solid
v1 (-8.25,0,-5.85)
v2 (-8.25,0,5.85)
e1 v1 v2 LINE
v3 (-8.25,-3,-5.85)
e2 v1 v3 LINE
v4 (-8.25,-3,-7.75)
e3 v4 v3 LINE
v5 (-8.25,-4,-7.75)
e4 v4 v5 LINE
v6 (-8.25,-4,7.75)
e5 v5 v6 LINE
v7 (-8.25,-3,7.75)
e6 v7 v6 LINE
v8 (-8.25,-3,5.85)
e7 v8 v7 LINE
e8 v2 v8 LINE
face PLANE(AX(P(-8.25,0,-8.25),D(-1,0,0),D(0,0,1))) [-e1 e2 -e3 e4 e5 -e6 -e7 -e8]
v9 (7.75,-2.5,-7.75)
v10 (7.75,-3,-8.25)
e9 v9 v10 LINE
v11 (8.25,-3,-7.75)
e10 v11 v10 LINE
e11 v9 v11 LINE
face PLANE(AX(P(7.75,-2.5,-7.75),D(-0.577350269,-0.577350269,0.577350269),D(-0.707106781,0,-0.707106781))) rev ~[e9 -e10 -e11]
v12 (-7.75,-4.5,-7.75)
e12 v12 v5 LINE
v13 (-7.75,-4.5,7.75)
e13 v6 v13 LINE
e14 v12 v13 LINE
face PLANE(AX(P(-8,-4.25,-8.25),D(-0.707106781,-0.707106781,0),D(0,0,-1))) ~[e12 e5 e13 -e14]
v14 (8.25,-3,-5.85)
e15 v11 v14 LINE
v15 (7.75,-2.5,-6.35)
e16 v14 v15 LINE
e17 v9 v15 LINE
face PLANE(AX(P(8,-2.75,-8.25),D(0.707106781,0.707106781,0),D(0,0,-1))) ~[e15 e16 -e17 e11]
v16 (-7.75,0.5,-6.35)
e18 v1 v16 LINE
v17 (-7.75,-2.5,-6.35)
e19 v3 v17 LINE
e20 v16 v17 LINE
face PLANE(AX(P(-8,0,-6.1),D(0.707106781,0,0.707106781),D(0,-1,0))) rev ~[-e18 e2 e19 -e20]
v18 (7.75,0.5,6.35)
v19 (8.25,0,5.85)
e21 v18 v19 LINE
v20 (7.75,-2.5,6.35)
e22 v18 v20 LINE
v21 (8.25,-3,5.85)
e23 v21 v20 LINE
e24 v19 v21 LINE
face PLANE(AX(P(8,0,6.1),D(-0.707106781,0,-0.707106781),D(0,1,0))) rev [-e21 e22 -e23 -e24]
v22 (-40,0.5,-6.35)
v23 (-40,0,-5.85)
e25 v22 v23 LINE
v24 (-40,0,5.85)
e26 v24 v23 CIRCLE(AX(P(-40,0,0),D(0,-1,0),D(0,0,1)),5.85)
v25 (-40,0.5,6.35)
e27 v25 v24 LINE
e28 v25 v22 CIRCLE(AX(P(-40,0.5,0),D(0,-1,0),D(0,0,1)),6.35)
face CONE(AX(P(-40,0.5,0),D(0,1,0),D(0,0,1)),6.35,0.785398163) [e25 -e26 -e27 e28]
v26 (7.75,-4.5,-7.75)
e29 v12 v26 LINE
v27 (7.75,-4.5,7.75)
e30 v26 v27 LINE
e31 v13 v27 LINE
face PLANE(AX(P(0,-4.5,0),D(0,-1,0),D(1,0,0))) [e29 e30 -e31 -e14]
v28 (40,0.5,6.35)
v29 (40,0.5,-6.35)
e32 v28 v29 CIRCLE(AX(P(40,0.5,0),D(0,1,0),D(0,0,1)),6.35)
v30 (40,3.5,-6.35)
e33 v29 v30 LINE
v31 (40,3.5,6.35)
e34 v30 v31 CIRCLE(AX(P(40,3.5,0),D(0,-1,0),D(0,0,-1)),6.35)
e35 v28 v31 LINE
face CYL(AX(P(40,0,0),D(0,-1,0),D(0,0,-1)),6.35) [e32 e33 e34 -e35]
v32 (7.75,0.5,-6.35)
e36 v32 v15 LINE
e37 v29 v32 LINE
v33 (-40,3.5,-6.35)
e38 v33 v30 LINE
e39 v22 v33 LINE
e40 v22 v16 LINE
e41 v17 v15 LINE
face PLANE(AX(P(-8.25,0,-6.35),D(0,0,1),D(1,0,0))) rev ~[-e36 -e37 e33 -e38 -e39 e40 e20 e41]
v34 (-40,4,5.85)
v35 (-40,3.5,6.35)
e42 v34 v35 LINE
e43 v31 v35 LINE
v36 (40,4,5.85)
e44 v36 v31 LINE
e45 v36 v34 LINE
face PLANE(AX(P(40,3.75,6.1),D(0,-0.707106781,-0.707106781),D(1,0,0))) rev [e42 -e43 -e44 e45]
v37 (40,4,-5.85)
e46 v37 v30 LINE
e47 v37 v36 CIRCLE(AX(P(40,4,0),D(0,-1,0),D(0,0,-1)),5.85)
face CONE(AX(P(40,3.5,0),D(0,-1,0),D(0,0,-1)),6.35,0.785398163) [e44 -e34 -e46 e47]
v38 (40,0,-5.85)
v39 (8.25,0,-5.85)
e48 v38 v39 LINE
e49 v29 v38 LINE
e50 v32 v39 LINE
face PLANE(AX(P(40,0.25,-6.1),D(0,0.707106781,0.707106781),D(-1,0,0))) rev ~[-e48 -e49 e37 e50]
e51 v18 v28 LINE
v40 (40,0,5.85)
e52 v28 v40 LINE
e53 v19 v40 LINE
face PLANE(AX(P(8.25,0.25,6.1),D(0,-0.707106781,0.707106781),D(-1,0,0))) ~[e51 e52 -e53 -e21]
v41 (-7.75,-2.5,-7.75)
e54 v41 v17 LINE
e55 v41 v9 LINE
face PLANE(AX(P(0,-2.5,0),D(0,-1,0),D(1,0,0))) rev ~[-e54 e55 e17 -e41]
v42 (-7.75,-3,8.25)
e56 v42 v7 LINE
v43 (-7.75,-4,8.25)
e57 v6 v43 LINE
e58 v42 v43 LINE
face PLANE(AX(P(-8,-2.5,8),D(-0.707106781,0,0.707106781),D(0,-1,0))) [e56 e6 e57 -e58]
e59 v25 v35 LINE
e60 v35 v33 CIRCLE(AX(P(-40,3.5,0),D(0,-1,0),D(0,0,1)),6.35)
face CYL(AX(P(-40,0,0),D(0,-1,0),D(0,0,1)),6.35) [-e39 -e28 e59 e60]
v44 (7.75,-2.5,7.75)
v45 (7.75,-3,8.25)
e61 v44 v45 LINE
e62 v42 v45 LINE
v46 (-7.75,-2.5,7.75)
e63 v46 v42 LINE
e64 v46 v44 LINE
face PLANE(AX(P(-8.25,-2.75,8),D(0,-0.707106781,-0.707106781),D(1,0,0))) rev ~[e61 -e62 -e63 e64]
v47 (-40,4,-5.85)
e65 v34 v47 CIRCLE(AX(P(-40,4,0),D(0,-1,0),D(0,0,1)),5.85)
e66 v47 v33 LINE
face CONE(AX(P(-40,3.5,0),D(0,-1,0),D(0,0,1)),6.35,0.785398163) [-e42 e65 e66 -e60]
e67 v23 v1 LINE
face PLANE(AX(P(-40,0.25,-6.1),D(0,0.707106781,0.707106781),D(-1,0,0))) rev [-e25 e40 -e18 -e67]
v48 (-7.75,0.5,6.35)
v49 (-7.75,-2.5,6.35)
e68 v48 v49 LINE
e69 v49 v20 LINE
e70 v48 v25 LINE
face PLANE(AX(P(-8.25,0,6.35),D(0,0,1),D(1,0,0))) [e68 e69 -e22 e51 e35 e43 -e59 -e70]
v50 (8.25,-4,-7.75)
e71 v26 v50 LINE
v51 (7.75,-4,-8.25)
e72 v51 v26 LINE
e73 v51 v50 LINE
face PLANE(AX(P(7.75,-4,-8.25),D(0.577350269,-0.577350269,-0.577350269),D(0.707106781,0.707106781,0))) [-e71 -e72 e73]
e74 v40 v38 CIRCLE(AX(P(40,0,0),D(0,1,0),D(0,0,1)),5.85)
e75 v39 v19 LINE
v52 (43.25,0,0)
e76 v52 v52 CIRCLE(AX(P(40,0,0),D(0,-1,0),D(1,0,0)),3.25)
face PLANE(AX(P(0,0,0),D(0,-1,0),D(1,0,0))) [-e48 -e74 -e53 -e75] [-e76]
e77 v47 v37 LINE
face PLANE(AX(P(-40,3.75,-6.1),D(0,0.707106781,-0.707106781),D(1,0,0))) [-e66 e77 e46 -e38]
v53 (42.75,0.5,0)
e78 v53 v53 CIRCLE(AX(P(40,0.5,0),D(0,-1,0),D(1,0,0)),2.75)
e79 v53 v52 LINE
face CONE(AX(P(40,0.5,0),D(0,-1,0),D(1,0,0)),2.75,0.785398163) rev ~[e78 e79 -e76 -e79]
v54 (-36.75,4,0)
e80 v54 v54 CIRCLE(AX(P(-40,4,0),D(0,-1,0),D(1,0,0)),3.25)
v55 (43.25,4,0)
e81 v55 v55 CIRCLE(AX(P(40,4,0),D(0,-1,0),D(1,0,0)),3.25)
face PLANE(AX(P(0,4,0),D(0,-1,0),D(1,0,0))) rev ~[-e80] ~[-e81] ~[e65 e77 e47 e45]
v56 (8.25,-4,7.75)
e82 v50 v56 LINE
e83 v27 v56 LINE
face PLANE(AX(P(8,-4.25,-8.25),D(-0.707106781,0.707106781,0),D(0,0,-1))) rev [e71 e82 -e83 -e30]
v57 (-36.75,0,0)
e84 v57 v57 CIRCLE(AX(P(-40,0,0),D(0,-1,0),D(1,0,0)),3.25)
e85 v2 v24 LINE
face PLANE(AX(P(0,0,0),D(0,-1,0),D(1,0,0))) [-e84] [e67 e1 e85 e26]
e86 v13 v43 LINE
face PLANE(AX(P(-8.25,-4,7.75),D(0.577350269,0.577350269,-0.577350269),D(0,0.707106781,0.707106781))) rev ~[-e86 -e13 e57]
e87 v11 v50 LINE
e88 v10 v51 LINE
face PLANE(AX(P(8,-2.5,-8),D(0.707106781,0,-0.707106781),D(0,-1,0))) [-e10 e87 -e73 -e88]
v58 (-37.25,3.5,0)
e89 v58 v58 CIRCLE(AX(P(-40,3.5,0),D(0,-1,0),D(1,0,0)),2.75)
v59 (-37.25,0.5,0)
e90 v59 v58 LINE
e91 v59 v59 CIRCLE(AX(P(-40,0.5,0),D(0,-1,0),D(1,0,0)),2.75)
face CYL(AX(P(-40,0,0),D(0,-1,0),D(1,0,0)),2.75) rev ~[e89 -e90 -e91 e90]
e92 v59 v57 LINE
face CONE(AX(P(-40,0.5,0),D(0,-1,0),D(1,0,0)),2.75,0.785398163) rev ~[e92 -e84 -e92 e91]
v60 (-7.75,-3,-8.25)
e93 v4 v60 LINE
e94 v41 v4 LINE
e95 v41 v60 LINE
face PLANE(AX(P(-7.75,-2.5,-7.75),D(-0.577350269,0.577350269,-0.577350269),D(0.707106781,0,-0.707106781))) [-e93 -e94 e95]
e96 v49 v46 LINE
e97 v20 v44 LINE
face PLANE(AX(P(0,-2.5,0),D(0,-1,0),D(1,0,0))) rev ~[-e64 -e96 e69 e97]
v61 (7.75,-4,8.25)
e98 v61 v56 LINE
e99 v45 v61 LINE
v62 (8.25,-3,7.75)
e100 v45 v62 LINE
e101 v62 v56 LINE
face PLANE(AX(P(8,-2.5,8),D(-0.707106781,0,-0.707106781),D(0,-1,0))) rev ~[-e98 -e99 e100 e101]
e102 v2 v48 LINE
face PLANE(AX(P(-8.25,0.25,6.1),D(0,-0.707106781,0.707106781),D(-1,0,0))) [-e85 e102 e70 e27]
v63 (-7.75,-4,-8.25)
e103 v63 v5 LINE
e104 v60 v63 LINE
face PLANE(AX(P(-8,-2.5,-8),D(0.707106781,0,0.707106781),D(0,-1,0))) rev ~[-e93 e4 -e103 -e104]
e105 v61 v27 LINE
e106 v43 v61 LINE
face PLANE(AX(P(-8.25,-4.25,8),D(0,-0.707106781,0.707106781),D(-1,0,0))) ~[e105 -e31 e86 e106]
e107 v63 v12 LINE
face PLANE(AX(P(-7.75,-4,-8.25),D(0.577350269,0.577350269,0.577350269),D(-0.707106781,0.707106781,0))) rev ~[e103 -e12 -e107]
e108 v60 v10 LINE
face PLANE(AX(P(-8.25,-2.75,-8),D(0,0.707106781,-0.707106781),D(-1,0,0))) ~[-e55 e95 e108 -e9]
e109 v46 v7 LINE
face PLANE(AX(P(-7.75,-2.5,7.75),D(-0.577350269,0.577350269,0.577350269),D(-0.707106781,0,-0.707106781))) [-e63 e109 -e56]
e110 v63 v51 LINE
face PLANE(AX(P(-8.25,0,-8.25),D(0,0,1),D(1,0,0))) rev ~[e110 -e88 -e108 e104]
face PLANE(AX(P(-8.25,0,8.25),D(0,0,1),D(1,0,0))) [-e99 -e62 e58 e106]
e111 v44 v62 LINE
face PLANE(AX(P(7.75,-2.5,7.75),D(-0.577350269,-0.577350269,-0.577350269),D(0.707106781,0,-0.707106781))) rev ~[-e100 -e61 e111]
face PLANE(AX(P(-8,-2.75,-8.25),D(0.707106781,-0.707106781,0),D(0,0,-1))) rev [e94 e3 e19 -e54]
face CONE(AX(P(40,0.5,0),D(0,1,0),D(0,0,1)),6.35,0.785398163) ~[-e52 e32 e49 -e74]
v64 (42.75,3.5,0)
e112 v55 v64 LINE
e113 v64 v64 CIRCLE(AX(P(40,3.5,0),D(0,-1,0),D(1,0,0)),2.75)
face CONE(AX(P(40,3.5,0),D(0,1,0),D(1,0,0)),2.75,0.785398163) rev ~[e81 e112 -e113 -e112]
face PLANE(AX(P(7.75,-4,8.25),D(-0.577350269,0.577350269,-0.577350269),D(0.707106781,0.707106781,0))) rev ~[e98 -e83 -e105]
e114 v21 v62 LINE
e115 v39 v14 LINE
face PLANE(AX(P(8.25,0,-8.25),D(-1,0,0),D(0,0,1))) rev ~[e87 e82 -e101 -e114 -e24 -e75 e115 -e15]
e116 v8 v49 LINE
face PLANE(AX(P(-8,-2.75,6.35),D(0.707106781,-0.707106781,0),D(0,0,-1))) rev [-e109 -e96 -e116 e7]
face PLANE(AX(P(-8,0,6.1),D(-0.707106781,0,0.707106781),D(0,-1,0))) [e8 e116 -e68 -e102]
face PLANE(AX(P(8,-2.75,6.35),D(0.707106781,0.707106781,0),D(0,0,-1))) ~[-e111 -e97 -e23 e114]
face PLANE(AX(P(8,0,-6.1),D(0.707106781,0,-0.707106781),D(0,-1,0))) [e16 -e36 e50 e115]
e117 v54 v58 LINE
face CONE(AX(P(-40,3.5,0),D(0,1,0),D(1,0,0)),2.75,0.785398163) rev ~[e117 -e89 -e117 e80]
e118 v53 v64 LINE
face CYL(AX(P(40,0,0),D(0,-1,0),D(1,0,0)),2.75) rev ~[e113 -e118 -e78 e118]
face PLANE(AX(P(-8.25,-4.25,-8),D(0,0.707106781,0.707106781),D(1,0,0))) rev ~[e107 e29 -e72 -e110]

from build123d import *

# Parameters (mm, degrees)
F0_R     = 2.75
F1_DEPTH = 4
F2_W     = 16.5
F2_H     = 16.5
F3_DEPTH = 4.5
F4_W     = 26.5
F4_H     = 22.7
F4_W_2   = 16.5
F4_H_2   = 12.7
F5_DEPTH = 2.5
F7_SIZE  = 0.5


with BuildPart() as f1:
    # F0 (on Front) → F1 (new body)
    with BuildSketch(Plane.XZ):
        with BuildLine():
            ThreePointArc((40, -6.35), (46.35, 0), (40, 6.35))
            Line((40, 6.35), (-40, 6.35))
            ThreePointArc((-40, 6.35), (-46.35, 0), (-40, -6.35))
            Line((-40, -6.35), (40, -6.35))
        make_face()
        with Locations((-40, 0)):
            Circle(F0_R, mode=Mode.SUBTRACT)
        with Locations((40, 0)):
            Circle(F0_R, mode=Mode.SUBTRACT)
    extrude(amount=-F1_DEPTH)

    # F2 (on Front) → F3 (join)
    with BuildSketch(Plane.XZ):
        Rectangle(F2_W, F2_H)
    extrude(amount=F3_DEPTH)

    # F4 (on face) → F5 (cut)
    with BuildSketch(Plane.XZ):
        Rectangle(F4_W, F4_H)
        Rectangle(F4_W_2, F4_H_2, mode=Mode.SUBTRACT)
    extrude(amount=F5_DEPTH, mode=Mode.SUBTRACT)

    # F7
    f7_edges = [f1.edges().sort_by_distance(p)[0] for p in [
        (8.25, -4.5, 0),
        (0, -4.5, 8.25),
        (-8.25, -4.5, 0),
        (0, -4.5, -8.25),
        (8.25, -3.5, 8.25),
        (-8.25, -3.5, 8.25),
        (-8.25, -3.5, -8.25),
        (8.25, -3.5, -8.25),
        (46.35, 4, 0),
        (0, 4, 6.35),
        (-46.35, 4, 0),
        (0, 4, -6.35),
        (-42.75, 4, 0),
        (37.25, 4, 0),
        (0, -2.5, 8.25),
        (8.25, -2.5, -7.3),
        (8.25, -2.5, 7.3),
        (-8.25, -2.5, 7.3),
        (-8.25, -2.5, -7.3),
        (0, -2.5, -8.25),
        (24.125, 0, 6.35),
        (37.25, 0, 0),
        (8.25, -1.25, 6.35),
        (8.25, -1.25, -6.35),
        (-8.25, -1.25, 6.35),
        (-8.25, -1.25, -6.35),
        (-24.125, 0, -6.35),
        (-42.75, 0, 0),
        (46.35, 0, 0),
        (-46.35, 0, 0),
        (-24.125, 0, 6.35),
        (24.125, 0, -6.35),
    ]]
    chamfer(f7_edges, length=F7_SIZE)


solid = f1.part
